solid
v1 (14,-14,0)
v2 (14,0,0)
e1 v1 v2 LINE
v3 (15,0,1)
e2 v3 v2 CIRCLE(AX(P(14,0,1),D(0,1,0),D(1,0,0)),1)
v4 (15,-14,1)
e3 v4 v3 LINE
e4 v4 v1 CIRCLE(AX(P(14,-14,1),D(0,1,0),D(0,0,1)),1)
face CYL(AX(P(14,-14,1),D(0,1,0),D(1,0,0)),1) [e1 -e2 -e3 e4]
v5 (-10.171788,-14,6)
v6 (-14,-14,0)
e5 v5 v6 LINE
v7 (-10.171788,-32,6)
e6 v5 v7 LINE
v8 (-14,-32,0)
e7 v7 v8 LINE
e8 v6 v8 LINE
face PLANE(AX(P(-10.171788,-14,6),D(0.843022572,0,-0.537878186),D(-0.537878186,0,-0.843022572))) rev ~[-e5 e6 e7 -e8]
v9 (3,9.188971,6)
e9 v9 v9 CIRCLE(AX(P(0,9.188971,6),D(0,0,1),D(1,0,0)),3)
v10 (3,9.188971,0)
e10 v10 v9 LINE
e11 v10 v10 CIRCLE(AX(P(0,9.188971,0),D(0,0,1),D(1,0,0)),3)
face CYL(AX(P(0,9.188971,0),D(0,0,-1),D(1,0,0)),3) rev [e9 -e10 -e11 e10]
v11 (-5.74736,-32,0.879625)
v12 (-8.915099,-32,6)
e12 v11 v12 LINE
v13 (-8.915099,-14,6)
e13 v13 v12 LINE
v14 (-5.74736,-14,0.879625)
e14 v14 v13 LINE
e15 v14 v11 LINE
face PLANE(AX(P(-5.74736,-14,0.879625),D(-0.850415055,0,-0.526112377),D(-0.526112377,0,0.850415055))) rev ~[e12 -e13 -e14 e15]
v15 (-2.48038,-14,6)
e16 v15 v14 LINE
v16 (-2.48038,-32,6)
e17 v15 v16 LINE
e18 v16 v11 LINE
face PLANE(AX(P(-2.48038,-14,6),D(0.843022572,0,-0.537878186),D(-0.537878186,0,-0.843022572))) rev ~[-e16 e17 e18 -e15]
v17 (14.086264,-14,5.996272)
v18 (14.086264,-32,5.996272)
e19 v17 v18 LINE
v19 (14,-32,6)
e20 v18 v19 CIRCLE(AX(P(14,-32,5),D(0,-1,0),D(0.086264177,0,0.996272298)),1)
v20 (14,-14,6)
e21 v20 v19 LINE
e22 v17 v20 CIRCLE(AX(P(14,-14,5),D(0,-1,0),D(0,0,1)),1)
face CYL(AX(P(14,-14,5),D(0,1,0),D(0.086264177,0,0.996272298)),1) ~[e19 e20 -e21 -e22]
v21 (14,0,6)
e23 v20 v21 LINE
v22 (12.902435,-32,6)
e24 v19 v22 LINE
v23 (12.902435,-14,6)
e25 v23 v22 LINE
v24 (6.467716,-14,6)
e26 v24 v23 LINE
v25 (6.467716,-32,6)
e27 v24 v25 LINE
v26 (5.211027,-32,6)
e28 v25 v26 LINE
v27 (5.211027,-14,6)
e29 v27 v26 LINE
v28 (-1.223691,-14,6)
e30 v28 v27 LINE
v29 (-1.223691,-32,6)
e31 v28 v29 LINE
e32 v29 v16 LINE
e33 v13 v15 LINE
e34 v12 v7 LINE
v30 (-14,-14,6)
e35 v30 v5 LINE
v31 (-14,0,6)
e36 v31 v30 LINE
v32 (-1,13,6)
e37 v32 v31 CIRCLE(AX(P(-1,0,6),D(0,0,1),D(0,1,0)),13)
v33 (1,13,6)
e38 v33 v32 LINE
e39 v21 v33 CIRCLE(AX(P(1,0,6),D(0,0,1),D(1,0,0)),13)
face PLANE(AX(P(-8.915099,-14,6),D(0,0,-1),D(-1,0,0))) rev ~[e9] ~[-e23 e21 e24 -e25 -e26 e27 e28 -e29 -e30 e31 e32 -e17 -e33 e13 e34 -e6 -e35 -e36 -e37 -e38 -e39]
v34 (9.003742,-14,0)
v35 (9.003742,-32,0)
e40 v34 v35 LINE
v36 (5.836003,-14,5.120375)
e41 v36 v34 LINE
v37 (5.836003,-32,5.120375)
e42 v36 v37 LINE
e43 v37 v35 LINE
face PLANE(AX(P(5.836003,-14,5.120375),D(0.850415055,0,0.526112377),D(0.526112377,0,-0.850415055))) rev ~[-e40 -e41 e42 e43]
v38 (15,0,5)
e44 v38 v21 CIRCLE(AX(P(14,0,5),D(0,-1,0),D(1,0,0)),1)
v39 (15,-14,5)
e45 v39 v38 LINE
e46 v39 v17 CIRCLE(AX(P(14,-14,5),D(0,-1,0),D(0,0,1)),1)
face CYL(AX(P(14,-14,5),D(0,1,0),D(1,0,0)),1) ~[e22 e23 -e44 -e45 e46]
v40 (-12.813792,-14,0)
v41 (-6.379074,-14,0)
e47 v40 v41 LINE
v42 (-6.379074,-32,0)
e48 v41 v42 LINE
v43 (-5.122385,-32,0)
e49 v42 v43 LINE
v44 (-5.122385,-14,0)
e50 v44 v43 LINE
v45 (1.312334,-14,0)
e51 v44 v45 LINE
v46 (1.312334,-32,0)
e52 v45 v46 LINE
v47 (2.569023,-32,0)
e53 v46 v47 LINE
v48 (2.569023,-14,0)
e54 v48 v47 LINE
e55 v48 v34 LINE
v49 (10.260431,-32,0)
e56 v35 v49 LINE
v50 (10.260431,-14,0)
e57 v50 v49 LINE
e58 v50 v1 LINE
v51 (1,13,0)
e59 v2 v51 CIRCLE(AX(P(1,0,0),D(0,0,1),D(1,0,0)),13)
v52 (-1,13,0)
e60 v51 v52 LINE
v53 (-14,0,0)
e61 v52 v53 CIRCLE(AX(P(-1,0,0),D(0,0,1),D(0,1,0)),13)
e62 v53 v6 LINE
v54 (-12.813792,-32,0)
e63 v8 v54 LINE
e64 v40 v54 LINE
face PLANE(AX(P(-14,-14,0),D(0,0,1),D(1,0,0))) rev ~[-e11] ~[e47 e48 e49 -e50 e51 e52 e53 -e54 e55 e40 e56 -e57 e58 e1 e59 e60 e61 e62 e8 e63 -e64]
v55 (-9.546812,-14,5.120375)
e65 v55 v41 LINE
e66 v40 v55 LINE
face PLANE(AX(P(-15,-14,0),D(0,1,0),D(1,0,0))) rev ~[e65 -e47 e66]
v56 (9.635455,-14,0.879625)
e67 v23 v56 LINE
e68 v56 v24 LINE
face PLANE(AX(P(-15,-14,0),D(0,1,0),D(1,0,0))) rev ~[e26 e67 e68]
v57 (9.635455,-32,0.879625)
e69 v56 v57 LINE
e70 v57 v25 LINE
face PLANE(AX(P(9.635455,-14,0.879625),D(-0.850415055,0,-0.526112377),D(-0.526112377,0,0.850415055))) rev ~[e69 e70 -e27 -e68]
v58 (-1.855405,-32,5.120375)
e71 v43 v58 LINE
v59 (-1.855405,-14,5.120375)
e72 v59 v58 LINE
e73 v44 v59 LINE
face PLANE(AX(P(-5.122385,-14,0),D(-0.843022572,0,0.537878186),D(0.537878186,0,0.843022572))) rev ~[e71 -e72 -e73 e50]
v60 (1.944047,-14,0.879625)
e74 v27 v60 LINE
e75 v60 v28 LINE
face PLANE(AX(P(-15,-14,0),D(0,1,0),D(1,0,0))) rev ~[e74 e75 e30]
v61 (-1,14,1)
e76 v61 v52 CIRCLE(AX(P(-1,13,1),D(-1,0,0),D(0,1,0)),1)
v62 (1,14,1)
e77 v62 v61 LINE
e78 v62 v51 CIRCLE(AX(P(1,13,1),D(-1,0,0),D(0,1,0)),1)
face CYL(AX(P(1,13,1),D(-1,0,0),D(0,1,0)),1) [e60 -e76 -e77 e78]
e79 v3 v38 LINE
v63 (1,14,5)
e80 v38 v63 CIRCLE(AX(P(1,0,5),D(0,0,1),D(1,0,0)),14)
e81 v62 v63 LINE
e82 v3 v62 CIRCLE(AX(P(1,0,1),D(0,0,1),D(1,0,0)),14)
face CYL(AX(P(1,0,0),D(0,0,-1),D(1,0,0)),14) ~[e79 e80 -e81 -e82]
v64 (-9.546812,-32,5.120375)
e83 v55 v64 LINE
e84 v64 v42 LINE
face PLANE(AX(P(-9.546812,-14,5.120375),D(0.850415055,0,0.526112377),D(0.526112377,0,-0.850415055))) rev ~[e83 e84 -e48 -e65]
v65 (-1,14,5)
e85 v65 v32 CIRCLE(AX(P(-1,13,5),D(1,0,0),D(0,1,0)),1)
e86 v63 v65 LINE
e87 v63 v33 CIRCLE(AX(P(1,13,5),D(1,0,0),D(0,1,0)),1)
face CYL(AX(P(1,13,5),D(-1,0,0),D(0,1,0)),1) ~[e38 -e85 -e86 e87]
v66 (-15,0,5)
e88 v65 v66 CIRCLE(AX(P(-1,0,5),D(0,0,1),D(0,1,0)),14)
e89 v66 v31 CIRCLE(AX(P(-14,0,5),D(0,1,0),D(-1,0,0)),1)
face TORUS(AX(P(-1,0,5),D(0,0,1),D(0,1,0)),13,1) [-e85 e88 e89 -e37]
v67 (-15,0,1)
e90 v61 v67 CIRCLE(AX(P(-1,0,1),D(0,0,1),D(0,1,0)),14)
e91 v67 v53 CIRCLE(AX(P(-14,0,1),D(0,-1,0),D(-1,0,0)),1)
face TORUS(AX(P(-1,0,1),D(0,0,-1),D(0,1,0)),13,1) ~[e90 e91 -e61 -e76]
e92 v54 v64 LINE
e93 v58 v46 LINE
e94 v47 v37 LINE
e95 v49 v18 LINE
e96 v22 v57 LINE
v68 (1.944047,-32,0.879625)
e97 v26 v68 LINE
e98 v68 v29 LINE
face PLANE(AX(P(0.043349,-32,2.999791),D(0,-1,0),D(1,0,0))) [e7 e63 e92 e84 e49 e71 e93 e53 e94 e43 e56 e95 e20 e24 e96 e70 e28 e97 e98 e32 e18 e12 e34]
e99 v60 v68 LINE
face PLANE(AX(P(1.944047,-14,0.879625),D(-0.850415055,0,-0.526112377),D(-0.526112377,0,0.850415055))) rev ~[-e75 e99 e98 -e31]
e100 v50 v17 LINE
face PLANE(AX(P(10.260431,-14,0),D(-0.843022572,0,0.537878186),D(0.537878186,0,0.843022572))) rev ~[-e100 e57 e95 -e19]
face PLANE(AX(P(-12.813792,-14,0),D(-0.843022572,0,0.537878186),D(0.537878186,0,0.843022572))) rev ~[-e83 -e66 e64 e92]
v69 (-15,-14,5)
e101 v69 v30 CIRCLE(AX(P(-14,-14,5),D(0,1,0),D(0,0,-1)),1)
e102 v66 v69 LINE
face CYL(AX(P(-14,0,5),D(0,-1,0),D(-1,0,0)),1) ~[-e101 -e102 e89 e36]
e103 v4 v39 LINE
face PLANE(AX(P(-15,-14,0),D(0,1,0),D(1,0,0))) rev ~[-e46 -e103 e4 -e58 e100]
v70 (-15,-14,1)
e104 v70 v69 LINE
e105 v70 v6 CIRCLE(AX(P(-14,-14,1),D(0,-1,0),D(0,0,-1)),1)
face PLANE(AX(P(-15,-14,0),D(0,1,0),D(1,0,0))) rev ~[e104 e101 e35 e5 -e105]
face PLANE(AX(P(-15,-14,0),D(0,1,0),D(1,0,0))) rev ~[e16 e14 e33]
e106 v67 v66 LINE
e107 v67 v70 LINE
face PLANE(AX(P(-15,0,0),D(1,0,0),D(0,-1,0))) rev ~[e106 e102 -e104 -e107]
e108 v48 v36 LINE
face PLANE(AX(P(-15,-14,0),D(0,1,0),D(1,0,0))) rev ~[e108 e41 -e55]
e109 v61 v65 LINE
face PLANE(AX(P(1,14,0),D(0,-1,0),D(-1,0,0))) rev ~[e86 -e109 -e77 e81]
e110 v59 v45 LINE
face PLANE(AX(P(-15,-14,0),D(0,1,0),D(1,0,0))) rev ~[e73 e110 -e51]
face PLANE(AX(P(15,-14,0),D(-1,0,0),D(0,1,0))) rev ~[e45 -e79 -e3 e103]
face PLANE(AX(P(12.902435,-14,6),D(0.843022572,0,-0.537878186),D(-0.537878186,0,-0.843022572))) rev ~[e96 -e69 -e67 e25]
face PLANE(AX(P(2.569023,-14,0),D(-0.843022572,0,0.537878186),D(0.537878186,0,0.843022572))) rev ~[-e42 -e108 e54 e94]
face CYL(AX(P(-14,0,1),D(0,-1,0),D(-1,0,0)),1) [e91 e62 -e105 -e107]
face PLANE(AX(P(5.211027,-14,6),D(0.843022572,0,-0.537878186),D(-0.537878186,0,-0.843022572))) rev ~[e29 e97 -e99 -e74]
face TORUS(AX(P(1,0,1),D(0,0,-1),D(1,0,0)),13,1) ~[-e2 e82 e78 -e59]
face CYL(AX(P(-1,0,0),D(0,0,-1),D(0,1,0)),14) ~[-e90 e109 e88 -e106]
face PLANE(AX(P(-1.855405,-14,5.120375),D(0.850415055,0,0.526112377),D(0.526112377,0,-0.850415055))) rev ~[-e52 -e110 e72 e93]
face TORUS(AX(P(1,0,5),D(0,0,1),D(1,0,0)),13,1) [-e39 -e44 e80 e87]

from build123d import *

# Parameters (mm, degrees)
F0_R     = 3
F1_DEPTH = 6
F3_R     = 1
F5_DEPTH = 18


with BuildPart() as f1:
    # F0 (on Top) → F1 (new body)
    with BuildSketch(Plane.XY):
        with BuildLine():
            Line((-15, -14), (15, -14))
            Line((15, -14), (15, 0))
            ThreePointArc((15, 0), (10.8994949366, 9.8994949366), (1, 14))
            Line((1, 14), (-1, 14))
            ThreePointArc((-1, 14), (-10.8994949366, 9.8994949366), (-15, 0))
            Line((-15, 0), (-15, -14))
        make_face()
        with Locations((0, 9.1889705509)):
            Circle(F0_R, mode=Mode.SUBTRACT)
    extrude(amount=F1_DEPTH)

    # F3
    f3_edges = [f1.edges().sort_by_distance(p)[0] for p in [
        (-10.899495, 9.899495, 6),
        (10.899495, 9.899495, 6),
        (-15, -7, 6),
        (15, -7, 6),
        (-15, -7, 0),
        (-10.899495, 9.899495, 0),
        (10.899495, 9.899495, 0),
        (15, -7, 0),
    ]]
    fillet(f3_edges, radius=F3_R)

    # F4 (on face) → F5 (join)
    with BuildSketch(Plane.XZ.offset(14)):
        with BuildLine():
            Line((-10.1717880173, 6), (-14, 0))
            Line((-14, 0), (-12.8137921418, 0))
            Line((-12.8137921418, 0), (-9.5468121047, 5.120374815))
            Line((-9.5468121047, 5.120374815), (-6.3790735405, 0))
            Line((-6.3790735405, 0), (-5.122384561, 0))
            Line((-5.122384561, 0), (-1.8554045239, 5.120374815))
            Line((-1.8554045239, 5.120374815), (1.3123340403, 0))
            Line((1.3123340403, 0), (2.5690230199, 0))
            Line((2.5690230199, 0), (5.836003057, 5.120374815))
            Line((5.836003057, 5.120374815), (9.0037416211, 0))
            Line((9.0037416211, 0), (10.2604306007, 0))
            Line((10.2604306007, 0), (14.0862641777, 5.9962722979))
            ThreePointArc((14.0862641777, 5.9962722979), (14.043172341, 5.9990676398), (14, 6))
            Line((14, 6), (12.9024347251, 6))
            Line((12.9024347251, 6), (9.635454688, 0.879625185))
            Line((9.635454688, 0.879625185), (6.4677161239, 6))
            Line((6.4677161239, 6), (5.2110271443, 6))
            Line((5.2110271443, 6), (1.9440471072, 0.879625185))
            Line((1.9440471072, 0.879625185), (-1.223691457, 6))
            Line((-1.223691457, 6), (-2.4803804365, 6))
            Line((-2.4803804365, 6), (-5.7473604736, 0.879625185))
            Line((-5.7473604736, 0.879625185), (-8.9150990378, 6))
            Line((-8.9150990378, 6), (-10.1717880173, 6))
        make_face()
    extrude(amount=F5_DEPTH)


solid = f1.part
